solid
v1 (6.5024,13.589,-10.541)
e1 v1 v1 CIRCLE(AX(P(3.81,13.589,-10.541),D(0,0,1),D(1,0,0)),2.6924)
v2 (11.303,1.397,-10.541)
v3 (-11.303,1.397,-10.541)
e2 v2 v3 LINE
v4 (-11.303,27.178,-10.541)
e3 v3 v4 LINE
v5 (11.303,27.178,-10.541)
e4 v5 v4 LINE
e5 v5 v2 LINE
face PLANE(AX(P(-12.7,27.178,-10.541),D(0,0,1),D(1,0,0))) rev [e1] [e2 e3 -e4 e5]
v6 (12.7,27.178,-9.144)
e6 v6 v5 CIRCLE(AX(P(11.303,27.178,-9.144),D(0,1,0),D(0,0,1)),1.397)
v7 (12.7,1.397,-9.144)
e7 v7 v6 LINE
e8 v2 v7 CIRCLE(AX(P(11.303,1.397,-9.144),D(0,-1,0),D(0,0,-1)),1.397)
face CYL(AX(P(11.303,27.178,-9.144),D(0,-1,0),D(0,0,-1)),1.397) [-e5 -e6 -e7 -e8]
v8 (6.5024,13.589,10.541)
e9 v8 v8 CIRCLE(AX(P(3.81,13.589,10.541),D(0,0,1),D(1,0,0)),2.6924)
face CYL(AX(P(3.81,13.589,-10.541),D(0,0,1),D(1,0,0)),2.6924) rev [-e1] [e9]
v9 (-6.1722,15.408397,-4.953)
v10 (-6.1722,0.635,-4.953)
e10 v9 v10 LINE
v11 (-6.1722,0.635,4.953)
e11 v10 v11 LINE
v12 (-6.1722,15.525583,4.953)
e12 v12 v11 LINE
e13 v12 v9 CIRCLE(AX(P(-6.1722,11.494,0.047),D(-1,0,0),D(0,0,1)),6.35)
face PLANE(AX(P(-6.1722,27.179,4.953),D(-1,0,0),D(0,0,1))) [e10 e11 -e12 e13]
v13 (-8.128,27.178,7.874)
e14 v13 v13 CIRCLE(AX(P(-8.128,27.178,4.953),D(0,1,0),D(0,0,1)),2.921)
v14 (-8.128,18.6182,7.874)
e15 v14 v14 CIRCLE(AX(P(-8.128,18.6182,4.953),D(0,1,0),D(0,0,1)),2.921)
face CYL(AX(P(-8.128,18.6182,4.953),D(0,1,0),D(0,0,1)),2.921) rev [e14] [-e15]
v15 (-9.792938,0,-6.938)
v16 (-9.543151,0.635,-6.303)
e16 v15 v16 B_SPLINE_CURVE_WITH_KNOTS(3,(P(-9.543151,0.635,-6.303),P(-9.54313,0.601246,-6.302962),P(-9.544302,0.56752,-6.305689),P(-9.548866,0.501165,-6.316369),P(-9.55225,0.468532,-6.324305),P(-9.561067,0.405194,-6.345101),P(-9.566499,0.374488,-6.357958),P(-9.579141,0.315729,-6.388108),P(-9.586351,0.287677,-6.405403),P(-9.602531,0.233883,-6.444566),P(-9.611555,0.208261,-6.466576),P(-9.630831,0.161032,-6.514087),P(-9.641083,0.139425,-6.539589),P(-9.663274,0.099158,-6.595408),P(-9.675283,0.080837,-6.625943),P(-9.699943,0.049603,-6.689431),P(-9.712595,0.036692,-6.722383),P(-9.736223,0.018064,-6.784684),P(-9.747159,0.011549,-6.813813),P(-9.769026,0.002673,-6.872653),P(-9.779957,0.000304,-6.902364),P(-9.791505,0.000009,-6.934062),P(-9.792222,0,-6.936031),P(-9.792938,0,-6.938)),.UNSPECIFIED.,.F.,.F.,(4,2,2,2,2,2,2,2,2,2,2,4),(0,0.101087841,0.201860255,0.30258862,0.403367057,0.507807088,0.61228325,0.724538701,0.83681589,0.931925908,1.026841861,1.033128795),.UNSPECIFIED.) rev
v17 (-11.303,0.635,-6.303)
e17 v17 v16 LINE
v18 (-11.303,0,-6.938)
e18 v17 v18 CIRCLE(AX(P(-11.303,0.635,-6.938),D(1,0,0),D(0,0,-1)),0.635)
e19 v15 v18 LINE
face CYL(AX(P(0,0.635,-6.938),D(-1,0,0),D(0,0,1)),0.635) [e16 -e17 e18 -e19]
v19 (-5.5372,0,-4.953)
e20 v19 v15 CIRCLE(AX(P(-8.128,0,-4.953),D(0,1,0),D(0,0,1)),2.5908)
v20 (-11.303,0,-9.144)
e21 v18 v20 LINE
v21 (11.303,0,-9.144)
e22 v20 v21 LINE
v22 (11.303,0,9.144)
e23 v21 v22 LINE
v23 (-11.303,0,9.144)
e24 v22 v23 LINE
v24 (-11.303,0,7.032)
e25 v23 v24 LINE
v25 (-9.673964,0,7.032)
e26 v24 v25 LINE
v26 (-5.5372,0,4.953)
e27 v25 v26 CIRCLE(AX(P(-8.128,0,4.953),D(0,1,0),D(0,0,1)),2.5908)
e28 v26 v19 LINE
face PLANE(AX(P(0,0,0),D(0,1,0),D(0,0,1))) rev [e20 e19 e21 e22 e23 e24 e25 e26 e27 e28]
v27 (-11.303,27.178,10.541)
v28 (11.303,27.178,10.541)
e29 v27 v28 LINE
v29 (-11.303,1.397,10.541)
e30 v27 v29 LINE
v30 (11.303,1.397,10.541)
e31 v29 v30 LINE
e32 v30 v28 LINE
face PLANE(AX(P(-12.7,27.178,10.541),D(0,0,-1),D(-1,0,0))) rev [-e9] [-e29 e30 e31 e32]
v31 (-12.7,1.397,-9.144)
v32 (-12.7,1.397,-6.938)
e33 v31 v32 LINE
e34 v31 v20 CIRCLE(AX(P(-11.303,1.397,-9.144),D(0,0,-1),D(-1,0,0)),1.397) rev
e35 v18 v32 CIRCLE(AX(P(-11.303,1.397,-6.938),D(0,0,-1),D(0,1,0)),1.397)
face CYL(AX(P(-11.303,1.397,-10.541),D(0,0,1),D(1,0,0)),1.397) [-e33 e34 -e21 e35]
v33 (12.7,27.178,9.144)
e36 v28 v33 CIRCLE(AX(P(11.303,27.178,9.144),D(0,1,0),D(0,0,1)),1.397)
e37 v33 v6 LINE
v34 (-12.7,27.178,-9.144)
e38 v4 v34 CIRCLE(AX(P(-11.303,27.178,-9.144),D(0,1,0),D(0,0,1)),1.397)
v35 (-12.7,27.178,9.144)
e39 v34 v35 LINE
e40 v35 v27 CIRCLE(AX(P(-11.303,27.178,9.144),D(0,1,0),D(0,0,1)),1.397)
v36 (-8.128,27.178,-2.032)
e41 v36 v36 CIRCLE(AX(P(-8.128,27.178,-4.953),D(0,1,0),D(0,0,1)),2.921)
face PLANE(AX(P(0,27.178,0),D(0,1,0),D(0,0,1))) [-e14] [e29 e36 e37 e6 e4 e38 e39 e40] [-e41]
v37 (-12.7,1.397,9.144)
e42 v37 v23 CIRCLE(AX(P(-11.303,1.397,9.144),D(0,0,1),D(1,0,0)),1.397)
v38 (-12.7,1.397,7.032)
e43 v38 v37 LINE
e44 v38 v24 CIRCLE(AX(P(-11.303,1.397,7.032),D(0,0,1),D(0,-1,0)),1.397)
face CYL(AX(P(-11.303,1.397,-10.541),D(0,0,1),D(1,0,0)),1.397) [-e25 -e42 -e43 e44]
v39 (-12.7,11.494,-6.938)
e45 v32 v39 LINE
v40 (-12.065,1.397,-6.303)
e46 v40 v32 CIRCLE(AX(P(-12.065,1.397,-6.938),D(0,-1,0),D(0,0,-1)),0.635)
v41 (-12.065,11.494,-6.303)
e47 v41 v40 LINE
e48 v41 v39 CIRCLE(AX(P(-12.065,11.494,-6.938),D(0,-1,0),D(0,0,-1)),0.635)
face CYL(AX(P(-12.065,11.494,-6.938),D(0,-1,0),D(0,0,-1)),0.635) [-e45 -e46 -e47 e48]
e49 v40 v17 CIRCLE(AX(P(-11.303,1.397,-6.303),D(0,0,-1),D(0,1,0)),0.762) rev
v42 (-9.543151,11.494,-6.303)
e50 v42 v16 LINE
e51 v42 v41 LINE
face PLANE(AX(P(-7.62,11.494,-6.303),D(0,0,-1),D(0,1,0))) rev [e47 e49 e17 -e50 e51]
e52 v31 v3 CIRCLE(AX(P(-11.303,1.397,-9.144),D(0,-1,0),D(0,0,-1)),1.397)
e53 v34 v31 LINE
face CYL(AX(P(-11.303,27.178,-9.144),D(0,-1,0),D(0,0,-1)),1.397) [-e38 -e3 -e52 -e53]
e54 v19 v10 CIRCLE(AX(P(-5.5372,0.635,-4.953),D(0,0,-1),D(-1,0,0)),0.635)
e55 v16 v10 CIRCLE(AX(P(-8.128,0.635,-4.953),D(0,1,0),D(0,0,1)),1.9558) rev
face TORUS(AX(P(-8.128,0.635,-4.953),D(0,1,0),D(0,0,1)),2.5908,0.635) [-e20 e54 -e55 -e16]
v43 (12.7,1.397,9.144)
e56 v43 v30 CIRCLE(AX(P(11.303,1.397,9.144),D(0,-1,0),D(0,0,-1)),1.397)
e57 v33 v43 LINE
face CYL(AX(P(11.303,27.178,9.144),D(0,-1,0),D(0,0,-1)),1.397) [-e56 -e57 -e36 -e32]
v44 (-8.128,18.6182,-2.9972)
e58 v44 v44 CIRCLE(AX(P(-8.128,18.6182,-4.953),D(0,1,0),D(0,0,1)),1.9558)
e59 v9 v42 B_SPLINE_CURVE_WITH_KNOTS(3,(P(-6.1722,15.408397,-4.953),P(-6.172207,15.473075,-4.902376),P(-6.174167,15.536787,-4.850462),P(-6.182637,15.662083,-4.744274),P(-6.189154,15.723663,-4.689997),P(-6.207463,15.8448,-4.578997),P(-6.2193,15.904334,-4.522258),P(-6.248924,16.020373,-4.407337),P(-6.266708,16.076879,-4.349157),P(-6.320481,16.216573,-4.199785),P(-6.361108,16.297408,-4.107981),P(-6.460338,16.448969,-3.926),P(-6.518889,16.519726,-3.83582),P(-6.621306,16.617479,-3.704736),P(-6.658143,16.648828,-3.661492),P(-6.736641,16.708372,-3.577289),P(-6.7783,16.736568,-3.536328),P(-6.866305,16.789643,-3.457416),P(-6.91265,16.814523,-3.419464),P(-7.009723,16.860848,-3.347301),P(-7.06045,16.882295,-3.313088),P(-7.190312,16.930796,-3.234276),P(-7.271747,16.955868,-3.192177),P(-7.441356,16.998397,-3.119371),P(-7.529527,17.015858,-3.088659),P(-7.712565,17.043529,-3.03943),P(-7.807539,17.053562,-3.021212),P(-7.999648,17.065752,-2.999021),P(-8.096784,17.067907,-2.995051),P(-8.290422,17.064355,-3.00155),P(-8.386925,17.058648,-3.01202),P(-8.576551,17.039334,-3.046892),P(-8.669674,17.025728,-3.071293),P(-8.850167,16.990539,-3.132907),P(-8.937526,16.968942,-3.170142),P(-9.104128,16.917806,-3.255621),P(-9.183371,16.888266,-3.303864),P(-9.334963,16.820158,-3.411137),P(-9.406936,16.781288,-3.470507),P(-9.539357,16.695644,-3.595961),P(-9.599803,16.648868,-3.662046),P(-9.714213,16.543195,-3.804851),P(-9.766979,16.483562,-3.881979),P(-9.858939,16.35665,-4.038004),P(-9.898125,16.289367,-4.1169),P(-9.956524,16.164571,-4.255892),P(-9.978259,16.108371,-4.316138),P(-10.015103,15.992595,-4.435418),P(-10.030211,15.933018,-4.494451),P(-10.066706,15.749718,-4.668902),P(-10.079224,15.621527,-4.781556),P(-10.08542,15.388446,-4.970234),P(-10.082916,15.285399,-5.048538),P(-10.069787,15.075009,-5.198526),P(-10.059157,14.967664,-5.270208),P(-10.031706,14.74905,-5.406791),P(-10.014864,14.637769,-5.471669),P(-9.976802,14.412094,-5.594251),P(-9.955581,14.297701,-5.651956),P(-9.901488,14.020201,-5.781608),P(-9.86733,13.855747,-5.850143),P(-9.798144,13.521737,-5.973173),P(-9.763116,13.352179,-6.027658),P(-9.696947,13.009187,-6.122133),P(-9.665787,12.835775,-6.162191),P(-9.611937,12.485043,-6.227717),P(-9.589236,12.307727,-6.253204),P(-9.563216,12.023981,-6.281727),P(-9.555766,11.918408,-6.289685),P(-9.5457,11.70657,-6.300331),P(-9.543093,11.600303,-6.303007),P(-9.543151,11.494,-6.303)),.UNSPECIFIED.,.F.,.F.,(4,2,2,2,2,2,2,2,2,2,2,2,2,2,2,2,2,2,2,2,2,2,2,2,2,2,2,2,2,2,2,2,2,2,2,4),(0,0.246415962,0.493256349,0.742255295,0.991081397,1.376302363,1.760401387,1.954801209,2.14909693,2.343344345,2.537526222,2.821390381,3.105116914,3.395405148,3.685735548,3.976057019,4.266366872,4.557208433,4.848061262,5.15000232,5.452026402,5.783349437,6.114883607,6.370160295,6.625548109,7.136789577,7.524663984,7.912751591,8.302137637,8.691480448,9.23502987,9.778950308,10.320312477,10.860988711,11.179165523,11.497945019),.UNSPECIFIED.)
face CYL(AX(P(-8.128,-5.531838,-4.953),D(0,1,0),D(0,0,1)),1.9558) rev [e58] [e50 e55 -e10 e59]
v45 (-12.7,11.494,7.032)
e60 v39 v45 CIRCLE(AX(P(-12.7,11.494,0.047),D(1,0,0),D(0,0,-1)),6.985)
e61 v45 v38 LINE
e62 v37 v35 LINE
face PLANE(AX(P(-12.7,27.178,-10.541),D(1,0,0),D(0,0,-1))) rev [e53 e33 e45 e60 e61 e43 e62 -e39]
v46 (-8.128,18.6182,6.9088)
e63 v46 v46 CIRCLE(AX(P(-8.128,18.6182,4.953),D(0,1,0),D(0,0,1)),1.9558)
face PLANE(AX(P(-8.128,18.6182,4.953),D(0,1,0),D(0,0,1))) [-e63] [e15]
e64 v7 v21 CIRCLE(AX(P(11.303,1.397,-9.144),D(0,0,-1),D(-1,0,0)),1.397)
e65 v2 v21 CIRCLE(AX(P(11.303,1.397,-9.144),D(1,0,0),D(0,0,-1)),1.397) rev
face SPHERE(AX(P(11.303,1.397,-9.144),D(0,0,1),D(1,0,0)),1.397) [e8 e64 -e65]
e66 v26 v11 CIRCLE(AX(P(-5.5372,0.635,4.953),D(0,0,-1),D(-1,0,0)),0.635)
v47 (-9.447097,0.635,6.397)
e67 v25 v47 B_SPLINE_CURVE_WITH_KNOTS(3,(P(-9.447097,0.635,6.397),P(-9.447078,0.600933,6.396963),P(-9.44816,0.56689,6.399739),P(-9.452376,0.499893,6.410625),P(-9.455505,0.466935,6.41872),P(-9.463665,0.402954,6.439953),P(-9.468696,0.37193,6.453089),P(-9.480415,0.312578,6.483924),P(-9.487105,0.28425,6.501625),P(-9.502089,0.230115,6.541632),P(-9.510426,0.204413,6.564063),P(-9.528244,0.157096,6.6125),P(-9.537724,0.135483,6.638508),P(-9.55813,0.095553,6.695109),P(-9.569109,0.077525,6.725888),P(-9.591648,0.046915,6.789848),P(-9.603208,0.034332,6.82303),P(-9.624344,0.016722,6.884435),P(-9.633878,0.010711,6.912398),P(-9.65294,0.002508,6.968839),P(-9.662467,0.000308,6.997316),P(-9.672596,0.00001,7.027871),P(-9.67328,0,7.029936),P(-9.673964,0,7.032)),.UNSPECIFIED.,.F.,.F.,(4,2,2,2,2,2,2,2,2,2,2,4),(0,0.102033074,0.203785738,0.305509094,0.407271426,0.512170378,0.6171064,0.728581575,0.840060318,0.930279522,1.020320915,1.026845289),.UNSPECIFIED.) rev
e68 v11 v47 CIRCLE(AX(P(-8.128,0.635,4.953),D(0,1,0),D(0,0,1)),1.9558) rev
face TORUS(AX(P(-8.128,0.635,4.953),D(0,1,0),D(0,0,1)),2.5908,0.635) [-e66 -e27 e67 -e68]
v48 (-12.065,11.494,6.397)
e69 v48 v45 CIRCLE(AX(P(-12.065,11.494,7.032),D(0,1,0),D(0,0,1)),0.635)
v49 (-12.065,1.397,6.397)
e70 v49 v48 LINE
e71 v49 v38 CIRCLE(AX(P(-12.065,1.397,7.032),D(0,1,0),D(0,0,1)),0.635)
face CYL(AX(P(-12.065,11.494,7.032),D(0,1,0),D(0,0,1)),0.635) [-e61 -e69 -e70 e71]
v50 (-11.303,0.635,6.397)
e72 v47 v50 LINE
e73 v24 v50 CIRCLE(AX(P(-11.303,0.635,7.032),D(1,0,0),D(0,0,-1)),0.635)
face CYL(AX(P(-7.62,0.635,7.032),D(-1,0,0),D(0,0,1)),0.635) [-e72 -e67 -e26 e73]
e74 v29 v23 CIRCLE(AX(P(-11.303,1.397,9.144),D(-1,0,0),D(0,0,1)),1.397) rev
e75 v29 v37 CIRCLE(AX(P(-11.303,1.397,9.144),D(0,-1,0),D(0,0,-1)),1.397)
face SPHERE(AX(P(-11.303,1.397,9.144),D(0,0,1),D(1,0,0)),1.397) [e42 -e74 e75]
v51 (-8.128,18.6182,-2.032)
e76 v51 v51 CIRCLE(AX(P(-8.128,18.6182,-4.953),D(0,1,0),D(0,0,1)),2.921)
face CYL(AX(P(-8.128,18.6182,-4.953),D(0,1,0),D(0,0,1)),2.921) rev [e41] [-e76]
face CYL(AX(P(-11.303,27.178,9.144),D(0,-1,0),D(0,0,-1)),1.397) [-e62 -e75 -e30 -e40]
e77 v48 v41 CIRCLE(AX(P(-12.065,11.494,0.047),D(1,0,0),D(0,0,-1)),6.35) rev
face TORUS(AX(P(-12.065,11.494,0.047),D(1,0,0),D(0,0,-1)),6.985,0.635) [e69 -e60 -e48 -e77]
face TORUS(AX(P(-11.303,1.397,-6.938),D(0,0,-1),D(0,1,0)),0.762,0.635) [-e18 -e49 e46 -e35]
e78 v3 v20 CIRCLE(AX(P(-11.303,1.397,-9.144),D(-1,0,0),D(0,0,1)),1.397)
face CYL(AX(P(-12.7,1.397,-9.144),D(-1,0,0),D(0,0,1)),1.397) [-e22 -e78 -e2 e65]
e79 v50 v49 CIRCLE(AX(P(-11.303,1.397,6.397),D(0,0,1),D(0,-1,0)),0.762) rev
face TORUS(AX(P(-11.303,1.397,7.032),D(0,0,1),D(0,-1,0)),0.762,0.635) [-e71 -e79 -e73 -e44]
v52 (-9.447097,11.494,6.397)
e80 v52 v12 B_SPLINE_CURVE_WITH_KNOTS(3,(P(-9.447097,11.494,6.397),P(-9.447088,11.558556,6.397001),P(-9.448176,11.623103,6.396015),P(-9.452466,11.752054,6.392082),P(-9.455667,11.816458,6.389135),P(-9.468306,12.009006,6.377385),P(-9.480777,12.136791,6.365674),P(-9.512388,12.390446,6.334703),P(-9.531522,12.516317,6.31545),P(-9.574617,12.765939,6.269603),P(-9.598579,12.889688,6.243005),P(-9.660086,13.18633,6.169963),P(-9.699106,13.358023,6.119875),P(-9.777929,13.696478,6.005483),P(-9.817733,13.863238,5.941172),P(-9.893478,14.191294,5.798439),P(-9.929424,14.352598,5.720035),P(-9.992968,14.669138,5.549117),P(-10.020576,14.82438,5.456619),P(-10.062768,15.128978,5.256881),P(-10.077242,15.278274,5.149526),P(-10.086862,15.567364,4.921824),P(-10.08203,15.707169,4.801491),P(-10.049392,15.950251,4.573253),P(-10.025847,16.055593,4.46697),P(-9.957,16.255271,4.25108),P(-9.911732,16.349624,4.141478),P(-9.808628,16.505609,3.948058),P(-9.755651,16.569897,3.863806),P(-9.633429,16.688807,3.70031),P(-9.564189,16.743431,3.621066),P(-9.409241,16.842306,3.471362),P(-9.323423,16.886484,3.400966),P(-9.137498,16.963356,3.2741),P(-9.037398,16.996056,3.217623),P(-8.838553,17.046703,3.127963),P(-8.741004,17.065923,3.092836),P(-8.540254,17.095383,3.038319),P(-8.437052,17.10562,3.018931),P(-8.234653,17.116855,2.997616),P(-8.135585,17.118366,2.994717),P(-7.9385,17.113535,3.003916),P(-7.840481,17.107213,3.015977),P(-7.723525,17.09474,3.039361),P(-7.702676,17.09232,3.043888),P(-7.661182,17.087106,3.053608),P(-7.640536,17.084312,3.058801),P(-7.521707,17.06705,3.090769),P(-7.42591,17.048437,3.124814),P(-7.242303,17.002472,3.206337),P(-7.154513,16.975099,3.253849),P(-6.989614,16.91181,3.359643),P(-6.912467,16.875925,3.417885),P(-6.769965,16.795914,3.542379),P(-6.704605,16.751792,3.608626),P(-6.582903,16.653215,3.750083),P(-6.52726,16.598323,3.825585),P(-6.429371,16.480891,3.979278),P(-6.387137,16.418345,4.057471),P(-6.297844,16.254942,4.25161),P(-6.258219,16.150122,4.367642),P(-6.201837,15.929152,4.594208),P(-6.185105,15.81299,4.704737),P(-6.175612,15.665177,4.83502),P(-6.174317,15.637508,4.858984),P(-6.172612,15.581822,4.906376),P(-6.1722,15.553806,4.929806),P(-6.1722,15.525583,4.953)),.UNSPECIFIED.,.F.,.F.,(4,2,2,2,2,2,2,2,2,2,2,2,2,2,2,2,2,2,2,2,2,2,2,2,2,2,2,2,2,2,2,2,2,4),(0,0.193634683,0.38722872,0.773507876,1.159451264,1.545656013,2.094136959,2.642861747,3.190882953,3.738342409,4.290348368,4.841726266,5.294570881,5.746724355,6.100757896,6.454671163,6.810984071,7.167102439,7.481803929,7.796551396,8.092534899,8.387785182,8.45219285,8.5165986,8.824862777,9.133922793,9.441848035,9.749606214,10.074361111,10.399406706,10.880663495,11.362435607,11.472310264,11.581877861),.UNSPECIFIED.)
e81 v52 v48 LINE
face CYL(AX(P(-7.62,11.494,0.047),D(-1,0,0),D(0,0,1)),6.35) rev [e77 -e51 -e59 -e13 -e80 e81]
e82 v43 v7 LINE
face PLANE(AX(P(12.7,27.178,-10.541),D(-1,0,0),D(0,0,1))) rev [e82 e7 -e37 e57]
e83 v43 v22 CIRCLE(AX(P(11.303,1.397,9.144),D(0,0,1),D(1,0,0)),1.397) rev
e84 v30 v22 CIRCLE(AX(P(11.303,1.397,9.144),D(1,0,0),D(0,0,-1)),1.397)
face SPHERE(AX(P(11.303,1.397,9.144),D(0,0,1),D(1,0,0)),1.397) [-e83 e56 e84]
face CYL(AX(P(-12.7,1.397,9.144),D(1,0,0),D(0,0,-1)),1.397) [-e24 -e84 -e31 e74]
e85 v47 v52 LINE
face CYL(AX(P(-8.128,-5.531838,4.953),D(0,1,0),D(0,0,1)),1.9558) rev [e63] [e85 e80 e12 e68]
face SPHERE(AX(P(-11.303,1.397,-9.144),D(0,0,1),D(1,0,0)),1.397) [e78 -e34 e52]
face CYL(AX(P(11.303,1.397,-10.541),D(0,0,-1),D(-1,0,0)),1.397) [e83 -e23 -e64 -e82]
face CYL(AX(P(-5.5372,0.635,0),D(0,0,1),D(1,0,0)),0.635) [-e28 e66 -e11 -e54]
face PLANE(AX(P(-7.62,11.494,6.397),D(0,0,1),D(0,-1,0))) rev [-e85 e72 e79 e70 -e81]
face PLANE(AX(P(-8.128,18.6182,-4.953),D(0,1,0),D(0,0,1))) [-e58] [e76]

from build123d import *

# Parameters (mm, degrees)
SKETCH1_W           = 25.4
SKETCH1_H           = 21.082
BOSS_EXTRUDE1_DEPTH = 27.178
SKETCH2_R           = 2.921
CUT_EXTRUDE1_DEPTH  = 8.5598
SKETCH3_R           = 2.6924
CUT_EXTRUDE2_DEPTH  = 37.665847979
SKETCH9_R           = 1.9558
CUT_EXTRUDE4_DEPTH  = 27.178
CUT_EXTRUDE3_DEPTH  = 5.08
CUT_EXTRUDE5_START  = -7.62
CUT_EXTRUDE5_DEPTH  = 1.4478
FILLET1_R           = 1.397
FILLET2_R           = 0.635


with BuildPart() as part:
    # Sketch1 → Boss-Extrude1 (new body)
    with BuildSketch(Plane(origin=(0, 0, 0), x_dir=(1, 0, 0), z_dir=(0, 1, 0))):
        Rectangle(SKETCH1_W, SKETCH1_H)
    extrude(amount=BOSS_EXTRUDE1_DEPTH)

    # Sketch2 → Cut-Extrude1 (cut)
    with BuildSketch(Plane(origin=(0, 27.178, 0), x_dir=(1, 0, 0), z_dir=(0, 1, 0))):
        with Locations(Location((-8.128, -4.953, 0), (0, 0, 270))):
            Circle(SKETCH2_R)
        with Locations(Location((-8.128, 4.953, 0), (0, 0, 270))):
            Circle(SKETCH2_R)
    extrude(amount=-CUT_EXTRUDE1_DEPTH, mode=Mode.SUBTRACT)

    # Sketch3 → Cut-Extrude2 (cut, through all)
    with BuildSketch(Plane.XY.offset(10.541)):
        with Locations((3.81, 13.589)):
            Circle(SKETCH3_R)
    extrude(amount=-CUT_EXTRUDE2_DEPTH, mode=Mode.SUBTRACT)

    # Sketch9 → Cut-Extrude4 (cut)
    with BuildSketch(Plane(origin=(0, 27.178, 0), x_dir=(1, 0, 0), z_dir=(0, 1, 0))):
        with Locations(Location((-8.128, 4.953, 0), (0, 0, 270))):
            Circle(SKETCH9_R)
        with Locations(Location((-8.128, -4.953, 0), (0, 0, 270))):
            Circle(SKETCH9_R)
    extrude(amount=-CUT_EXTRUDE4_DEPTH, mode=Mode.SUBTRACT)

    # Sketch5 → Cut-Extrude3 (cut)
    with BuildSketch(Plane.ZY.offset(12.7)):
        with BuildLine():
            Line((-6.303, 11.494), (-6.303, 0))
            Line((-6.303, 0), (6.397, 0))
            Line((6.397, 0), (6.397, 11.494))
            ThreePointArc((6.397, 11.494), (0.047, 17.844), (-6.303, 11.494))
        make_face()
    extrude(amount=-CUT_EXTRUDE3_DEPTH, mode=Mode.SUBTRACT)

    # Cut-Extrude5: read off the stored shape, not the designer's step
    # Cut-Extrude5 outline → Cut-Extrude5 (cut)
    with BuildSketch(Plane.YZ.offset(CUT_EXTRUDE5_START)):
        with BuildLine():
            Line((15.525583312, 4.953), (0, 4.953))
            Line((0, 4.953), (0, -4.953))
            Line((0, -4.953), (15.408396505, -4.953))
            ThreePointArc((15.408396505, -4.953), (17.843555718, -0.028114492), (15.525583312, 4.953))
        make_face()
    extrude(amount=CUT_EXTRUDE5_DEPTH, mode=Mode.SUBTRACT)

    # Fillet1
    fillet1_edges = [part.edges().sort_by_distance(p)[0] for p in [
        (-12.7, 0, 8.469),
        (0, 0, 10.541),
        (-12.7, 0, -8.422),
        (0, 0, -10.541),
        (12.7, 0, 0),
        (12.7, 13.589, 10.541),
        (-12.7, 13.589, 10.541),
        (-12.7, 13.589, -10.541),
        (12.7, 13.589, -10.541),
    ]]
    fillet(fillet1_edges, radius=FILLET1_R)

    # Fillet2
    fillet2_edges = [part.edges().sort_by_distance(p)[0] for p in [
        (-7.400882257, 0, -6.768613788),
        (-10.375048641, 0, 6.397),
        (-10.423075727, 0, -6.303),
        (-12.7, 17.844, 0.047),
        (-12.7, 6.4455, -6.303),
        (-6.745040557, 0, 6.335959443),
        (-6.1722, 0, 0),
        (-12.7, 6.4455, 6.397),
        (-12.290828173, 0.409171827, -6.303),
        (-12.290828173, 0.409171827, 6.397),
    ]]
    fillet(fillet2_edges, radius=FILLET2_R)


solid = part.part
